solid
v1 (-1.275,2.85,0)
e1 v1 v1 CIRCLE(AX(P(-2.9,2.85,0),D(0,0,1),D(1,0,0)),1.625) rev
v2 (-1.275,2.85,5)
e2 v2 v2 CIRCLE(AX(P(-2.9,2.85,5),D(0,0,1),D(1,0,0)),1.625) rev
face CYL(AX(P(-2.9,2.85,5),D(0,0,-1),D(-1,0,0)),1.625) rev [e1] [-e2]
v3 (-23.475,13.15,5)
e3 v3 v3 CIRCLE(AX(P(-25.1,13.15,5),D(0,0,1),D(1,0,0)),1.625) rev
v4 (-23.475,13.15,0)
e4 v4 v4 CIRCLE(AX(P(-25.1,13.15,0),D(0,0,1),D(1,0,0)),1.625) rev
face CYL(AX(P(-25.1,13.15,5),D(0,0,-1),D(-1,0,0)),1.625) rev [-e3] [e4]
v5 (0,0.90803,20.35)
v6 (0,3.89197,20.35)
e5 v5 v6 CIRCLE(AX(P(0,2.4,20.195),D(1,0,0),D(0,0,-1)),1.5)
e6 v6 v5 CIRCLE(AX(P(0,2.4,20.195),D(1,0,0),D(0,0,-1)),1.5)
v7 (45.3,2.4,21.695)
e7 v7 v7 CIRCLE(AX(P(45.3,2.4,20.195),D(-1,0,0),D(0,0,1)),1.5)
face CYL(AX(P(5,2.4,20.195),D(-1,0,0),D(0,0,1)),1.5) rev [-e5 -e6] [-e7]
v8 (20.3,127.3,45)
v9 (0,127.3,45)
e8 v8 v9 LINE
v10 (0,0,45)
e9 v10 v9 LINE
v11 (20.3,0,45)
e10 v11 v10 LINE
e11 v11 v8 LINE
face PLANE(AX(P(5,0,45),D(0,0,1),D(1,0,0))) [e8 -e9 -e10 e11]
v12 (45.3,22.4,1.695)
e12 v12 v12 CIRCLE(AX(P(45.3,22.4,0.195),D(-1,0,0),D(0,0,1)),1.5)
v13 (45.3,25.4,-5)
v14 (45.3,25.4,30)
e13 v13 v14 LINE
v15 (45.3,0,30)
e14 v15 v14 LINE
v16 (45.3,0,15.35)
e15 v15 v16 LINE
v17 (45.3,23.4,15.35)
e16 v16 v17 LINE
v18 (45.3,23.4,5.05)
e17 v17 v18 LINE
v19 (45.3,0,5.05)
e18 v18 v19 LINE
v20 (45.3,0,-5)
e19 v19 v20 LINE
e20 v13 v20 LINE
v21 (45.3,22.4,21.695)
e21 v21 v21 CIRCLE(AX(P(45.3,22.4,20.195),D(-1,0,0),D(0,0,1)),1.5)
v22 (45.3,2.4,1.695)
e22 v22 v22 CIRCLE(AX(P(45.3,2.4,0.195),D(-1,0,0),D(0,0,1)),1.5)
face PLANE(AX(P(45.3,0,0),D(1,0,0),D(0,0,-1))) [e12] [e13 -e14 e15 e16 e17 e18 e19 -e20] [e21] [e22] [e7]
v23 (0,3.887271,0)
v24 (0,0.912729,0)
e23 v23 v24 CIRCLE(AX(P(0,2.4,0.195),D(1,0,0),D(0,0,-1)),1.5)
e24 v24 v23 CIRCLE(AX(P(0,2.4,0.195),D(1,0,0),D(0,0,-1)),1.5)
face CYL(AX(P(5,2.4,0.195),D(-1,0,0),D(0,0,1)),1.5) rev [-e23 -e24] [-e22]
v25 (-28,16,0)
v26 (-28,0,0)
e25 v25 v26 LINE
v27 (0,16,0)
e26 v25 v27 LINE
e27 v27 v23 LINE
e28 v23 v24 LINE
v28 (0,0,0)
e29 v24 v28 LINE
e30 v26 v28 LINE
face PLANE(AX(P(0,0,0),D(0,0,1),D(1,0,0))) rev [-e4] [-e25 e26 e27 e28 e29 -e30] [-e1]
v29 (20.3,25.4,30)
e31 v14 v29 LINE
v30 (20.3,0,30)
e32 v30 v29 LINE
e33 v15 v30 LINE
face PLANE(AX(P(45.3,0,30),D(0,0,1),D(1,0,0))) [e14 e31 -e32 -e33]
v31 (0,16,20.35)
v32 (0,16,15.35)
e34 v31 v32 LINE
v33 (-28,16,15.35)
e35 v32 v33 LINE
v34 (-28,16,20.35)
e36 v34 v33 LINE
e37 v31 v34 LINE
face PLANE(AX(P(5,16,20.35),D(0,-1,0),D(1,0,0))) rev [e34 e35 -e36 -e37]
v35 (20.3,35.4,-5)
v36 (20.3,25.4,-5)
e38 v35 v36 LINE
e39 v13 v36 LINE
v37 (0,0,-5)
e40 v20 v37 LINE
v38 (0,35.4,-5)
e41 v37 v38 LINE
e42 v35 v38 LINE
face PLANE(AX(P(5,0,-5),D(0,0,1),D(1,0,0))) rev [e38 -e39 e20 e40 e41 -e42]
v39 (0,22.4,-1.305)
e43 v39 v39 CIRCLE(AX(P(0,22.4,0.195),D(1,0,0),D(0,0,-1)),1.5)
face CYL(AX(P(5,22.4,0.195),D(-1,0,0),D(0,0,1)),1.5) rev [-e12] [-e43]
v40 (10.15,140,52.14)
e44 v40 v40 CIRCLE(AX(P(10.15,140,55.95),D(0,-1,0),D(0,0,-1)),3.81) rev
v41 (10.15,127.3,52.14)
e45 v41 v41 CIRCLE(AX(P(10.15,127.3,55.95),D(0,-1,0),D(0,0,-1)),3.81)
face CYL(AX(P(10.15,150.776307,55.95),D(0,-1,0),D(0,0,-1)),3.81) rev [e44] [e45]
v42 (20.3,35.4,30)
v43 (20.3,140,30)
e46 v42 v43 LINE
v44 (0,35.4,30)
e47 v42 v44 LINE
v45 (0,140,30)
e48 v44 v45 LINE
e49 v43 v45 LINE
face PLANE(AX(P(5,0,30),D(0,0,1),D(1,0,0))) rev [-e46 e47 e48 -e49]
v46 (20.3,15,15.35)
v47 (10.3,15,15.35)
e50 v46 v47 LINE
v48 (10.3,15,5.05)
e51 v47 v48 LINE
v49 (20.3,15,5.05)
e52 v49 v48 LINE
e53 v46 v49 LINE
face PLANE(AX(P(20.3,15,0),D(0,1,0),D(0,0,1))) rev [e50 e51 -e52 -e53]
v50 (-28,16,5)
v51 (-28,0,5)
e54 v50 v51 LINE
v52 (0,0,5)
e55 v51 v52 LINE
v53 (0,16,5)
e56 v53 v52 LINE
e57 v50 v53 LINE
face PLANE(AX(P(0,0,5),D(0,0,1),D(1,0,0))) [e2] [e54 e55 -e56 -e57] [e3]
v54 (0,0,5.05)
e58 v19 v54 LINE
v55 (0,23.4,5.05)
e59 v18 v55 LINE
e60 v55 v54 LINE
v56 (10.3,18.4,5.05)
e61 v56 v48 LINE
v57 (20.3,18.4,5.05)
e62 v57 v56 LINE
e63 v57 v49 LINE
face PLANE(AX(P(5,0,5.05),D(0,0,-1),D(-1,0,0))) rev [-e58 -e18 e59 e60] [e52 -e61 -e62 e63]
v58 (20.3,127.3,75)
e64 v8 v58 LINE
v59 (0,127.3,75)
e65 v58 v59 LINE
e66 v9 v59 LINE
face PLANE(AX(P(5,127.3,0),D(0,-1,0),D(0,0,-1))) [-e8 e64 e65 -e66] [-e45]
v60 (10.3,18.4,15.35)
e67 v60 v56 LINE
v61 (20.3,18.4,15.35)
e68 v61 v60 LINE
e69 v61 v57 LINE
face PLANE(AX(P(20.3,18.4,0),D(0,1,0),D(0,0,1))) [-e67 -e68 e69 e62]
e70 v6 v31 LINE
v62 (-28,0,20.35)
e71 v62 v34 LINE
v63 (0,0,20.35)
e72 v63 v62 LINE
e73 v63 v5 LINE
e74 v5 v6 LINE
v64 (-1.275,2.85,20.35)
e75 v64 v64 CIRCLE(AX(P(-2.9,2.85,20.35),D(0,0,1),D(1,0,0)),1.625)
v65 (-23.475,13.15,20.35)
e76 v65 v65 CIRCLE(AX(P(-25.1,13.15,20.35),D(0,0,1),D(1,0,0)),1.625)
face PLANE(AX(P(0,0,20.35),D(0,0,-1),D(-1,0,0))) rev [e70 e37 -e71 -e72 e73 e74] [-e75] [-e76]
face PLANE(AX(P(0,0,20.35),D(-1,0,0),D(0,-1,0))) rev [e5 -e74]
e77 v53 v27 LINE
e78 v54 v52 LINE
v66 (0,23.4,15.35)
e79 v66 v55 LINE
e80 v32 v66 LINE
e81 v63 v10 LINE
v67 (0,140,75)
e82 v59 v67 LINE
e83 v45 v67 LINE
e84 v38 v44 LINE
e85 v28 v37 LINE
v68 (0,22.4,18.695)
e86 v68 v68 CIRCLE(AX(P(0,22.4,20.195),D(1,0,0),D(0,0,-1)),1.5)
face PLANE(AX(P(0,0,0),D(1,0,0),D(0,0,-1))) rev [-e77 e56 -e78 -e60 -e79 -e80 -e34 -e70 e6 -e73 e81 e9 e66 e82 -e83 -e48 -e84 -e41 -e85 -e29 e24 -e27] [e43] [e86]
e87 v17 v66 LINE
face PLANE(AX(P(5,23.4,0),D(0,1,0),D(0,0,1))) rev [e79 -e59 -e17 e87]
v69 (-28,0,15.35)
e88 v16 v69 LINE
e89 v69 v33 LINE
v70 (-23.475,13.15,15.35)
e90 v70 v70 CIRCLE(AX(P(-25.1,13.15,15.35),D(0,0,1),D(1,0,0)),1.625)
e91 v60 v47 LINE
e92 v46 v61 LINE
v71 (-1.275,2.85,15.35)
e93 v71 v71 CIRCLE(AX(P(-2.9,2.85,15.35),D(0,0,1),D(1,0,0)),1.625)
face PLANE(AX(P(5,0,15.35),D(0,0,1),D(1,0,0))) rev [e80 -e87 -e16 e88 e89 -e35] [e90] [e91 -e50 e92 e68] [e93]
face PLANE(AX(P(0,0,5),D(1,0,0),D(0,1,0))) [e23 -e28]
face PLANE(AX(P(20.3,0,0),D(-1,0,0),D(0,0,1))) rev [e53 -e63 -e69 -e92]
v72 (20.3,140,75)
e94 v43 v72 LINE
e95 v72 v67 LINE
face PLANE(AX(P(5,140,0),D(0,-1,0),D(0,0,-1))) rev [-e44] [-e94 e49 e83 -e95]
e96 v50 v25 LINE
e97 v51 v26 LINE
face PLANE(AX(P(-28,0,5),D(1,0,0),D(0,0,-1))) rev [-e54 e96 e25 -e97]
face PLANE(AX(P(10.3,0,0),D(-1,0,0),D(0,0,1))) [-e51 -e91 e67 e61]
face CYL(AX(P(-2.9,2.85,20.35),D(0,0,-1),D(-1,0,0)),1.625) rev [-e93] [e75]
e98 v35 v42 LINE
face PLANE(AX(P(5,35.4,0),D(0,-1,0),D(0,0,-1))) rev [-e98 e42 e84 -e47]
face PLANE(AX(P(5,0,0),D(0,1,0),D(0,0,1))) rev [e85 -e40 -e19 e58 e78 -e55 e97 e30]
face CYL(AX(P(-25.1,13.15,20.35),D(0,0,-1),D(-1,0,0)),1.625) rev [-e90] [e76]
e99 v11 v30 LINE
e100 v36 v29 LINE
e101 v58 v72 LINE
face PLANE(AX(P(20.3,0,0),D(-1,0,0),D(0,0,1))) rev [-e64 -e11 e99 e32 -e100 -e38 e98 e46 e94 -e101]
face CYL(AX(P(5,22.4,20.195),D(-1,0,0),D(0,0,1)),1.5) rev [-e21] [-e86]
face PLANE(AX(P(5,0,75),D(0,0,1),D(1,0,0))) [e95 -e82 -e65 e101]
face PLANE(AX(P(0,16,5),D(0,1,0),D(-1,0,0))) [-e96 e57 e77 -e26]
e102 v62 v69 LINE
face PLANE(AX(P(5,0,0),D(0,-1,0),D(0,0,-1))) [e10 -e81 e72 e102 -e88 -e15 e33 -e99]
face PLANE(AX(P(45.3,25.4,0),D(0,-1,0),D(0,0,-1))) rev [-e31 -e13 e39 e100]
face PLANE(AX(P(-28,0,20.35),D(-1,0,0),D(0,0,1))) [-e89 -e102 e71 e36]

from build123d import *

# Parameters (mm, degrees)
SKETCH1_R           = 1.5
BOSS_EXTRUDE1_DEPTH = 5
BOSS_EXTRUDE2_START = 5
SKETCH1_4_R         = 1.5
BOSS_EXTRUDE2_DEPTH = 10.3
BOSS_EXTRUDE3_START = 15.3
SKETCH1_5_W         = 10.3
SKETCH1_5_H         = 5
SKETCH1_5_R         = 1.5
BOSS_EXTRUDE3_DEPTH = 5
SKETCH2_W           = 28
SKETCH2_H           = 16
SKETCH2_R           = 1.625
BOSS_EXTRUDE4_DEPTH = 5
BOSS_EXTRUDE5_START = 15.35
SKETCH2_2_W         = 28
SKETCH2_2_H         = 16
SKETCH2_2_R         = 1.625
BOSS_EXTRUDE5_DEPTH = 5
CUT_EXTRUDE1_START  = 127.3
SKETCH3_R           = 3.81
CUT_EXTRUDE1_DEPTH  = 12.7
BOSS_EXTRUDE6_START = 20.3
SKETCH1_6_R         = 1.5
BOSS_EXTRUDE6_DEPTH = 25
BOSS_EXTRUDE7_START = 10.3
SKETCH1_7_W         = 10.3
SKETCH1_7_H         = 3.4
BOSS_EXTRUDE7_DEPTH = 5
BOSS_EXTRUDE8_DEPTH = 20


with BuildPart() as part:
    # Sketch1 → Boss-Extrude1 (new body)
    with BuildSketch(Plane(origin=(0, 0, 0), x_dir=(0, 0, -1), z_dir=(1, 0, 0))):
        Polygon((-15.35, 0), (-15.35, 23.4), (-5.05, 23.4), (-5.05, 0), (5, 0), (5, 35.4), (-30, 35.4), (-30, 140), (-75, 140), (-75, 127.3), (-45, 127.3), (-45, 0), align=None)
        with Locations((-0.195, 2.4)):
            Circle(SKETCH1_R, mode=Mode.SUBTRACT)
        with Locations((-0.195, 22.4)):
            Circle(SKETCH1_R, mode=Mode.SUBTRACT)
        with Locations((-20.195, 22.4)):
            Circle(SKETCH1_R, mode=Mode.SUBTRACT)
        with Locations((-20.195, 2.4)):
            Circle(SKETCH1_R, mode=Mode.SUBTRACT)
    extrude(amount=BOSS_EXTRUDE1_DEPTH)

    # Sketch1<4> → Boss-Extrude2 (add)
    with BuildSketch(Plane(origin=(0, 0, 0), x_dir=(0, 0, -1), z_dir=(1, 0, 0)).offset(BOSS_EXTRUDE2_START)):
        Polygon((-5.05, 0), (5, 0), (5, 25.4), (-30, 25.4), (-30, 140), (-75, 140), (-75, 127.3), (-45, 127.3), (-45, 0), (-15.35, 0), (-15.35, 23.4), (-5.05, 23.4), align=None)
        with Locations((-0.195, 22.4)):
            Circle(SKETCH1_4_R, mode=Mode.SUBTRACT)
        with Locations((-0.195, 2.4)):
            Circle(SKETCH1_4_R, mode=Mode.SUBTRACT)
        with Locations((-20.195, 2.4)):
            Circle(SKETCH1_4_R, mode=Mode.SUBTRACT)
        with Locations((-20.195, 22.4)):
            Circle(SKETCH1_4_R, mode=Mode.SUBTRACT)
    extrude(amount=BOSS_EXTRUDE2_DEPTH)

    # Sketch1<5> → Boss-Extrude3 (add)
    with BuildSketch(Plane(origin=(0, 0, 0), x_dir=(0, 0, -1), z_dir=(1, 0, 0)).offset(BOSS_EXTRUDE3_START)):
        Polygon((-15.35, 0), (-15.35, 15), (-5.05, 15), (-5.05, 0), (5, 0), (5, 35.4), (-30, 35.4), (-30, 140), (-75, 140), (-75, 127.3), (-45, 127.3), (-45, 0), align=None)
        with Locations((-10.2, 20.9)):
            Rectangle(SKETCH1_5_W, SKETCH1_5_H, mode=Mode.SUBTRACT)
        with Locations(Location((-0.195, 2.4, 0), (0, 0, 180))):
            Circle(SKETCH1_5_R, mode=Mode.SUBTRACT)
        with Locations(Location((-0.195, 22.4, 0), (0, 0, 180))):
            Circle(SKETCH1_5_R, mode=Mode.SUBTRACT)
        with Locations(Location((-20.195, 22.4, 0), (0, 0, 180))):
            Circle(SKETCH1_5_R, mode=Mode.SUBTRACT)
        with Locations(Location((-20.195, 2.4, 0), (0, 0, 180))):
            Circle(SKETCH1_5_R, mode=Mode.SUBTRACT)
    extrude(amount=BOSS_EXTRUDE3_DEPTH)

    # Sketch2 → Boss-Extrude4 (add)
    with BuildSketch(Plane.XY):
        with Locations((-14, 8)):
            Rectangle(SKETCH2_W, SKETCH2_H)
        with Locations((-2.9, 2.85)):
            Circle(SKETCH2_R, mode=Mode.SUBTRACT)
        with Locations((-25.1, 13.15)):
            Circle(SKETCH2_R, mode=Mode.SUBTRACT)
    extrude(amount=BOSS_EXTRUDE4_DEPTH)

    # Sketch2<2> → Boss-Extrude5 (add)
    with BuildSketch(Plane.XY.offset(BOSS_EXTRUDE5_START)):
        with Locations((-14, 8)):
            Rectangle(SKETCH2_2_W, SKETCH2_2_H)
        with Locations((-2.9, 2.85)):
            Circle(SKETCH2_2_R, mode=Mode.SUBTRACT)
        with Locations((-25.1, 13.15)):
            Circle(SKETCH2_2_R, mode=Mode.SUBTRACT)
    extrude(amount=BOSS_EXTRUDE5_DEPTH)

    # Sketch3 → Cut-Extrude1 (cut)
    with BuildSketch(Plane(origin=(0, 0, 0), x_dir=(1, 0, 0), z_dir=(0, 1, 0)).offset(CUT_EXTRUDE1_START)):
        with Locations(Location((10.15, -55.95, 0), (0, 0, 90))):
            Circle(SKETCH3_R)
    extrude(amount=CUT_EXTRUDE1_DEPTH, mode=Mode.SUBTRACT)

    # Sketch1<6> → Boss-Extrude6 (add)
    with BuildSketch(Plane(origin=(0, 0, 0), x_dir=(0, 0, -1), z_dir=(1, 0, 0)).offset(BOSS_EXTRUDE6_START)):
        Polygon((-5.05, 0), (5, 0), (5, 25.4), (-30, 25.4), (-30, 0), (-15.35, 0), (-15.35, 23.4), (-5.05, 23.4), align=None)
        with Locations(Location((-0.195, 22.4, 0), (0, 0, 180))):
            Circle(SKETCH1_6_R, mode=Mode.SUBTRACT)
        with Locations(Location((-0.195, 2.4, 0), (0, 0, 180))):
            Circle(SKETCH1_6_R, mode=Mode.SUBTRACT)
        with Locations(Location((-20.195, 2.4, 0), (0, 0, 180))):
            Circle(SKETCH1_6_R, mode=Mode.SUBTRACT)
        with Locations(Location((-20.195, 22.4, 0), (0, 0, 180))):
            Circle(SKETCH1_6_R, mode=Mode.SUBTRACT)
    extrude(amount=BOSS_EXTRUDE6_DEPTH)

    # Sketch1<7> → Boss-Extrude7 (add)
    with BuildSketch(Plane(origin=(0, 0, 0), x_dir=(0, 0, -1), z_dir=(1, 0, 0)).offset(BOSS_EXTRUDE7_START)):
        with Locations((-10.2, 16.7)):
            Rectangle(SKETCH1_7_W, SKETCH1_7_H)
    extrude(amount=BOSS_EXTRUDE7_DEPTH)

    # Sketch1<9> → Boss-Extrude8 (add)
    with BuildSketch(Plane(origin=(0, 0, 0), x_dir=(0, 0, -1), z_dir=(1, 0, 0))):
        Polygon((-30, 25.4), (0, 25.4), (5, 25.4), (5, 35.4), (-30, 35.4), align=None)
    extrude(amount=BOSS_EXTRUDE8_DEPTH)


solid = part.part
